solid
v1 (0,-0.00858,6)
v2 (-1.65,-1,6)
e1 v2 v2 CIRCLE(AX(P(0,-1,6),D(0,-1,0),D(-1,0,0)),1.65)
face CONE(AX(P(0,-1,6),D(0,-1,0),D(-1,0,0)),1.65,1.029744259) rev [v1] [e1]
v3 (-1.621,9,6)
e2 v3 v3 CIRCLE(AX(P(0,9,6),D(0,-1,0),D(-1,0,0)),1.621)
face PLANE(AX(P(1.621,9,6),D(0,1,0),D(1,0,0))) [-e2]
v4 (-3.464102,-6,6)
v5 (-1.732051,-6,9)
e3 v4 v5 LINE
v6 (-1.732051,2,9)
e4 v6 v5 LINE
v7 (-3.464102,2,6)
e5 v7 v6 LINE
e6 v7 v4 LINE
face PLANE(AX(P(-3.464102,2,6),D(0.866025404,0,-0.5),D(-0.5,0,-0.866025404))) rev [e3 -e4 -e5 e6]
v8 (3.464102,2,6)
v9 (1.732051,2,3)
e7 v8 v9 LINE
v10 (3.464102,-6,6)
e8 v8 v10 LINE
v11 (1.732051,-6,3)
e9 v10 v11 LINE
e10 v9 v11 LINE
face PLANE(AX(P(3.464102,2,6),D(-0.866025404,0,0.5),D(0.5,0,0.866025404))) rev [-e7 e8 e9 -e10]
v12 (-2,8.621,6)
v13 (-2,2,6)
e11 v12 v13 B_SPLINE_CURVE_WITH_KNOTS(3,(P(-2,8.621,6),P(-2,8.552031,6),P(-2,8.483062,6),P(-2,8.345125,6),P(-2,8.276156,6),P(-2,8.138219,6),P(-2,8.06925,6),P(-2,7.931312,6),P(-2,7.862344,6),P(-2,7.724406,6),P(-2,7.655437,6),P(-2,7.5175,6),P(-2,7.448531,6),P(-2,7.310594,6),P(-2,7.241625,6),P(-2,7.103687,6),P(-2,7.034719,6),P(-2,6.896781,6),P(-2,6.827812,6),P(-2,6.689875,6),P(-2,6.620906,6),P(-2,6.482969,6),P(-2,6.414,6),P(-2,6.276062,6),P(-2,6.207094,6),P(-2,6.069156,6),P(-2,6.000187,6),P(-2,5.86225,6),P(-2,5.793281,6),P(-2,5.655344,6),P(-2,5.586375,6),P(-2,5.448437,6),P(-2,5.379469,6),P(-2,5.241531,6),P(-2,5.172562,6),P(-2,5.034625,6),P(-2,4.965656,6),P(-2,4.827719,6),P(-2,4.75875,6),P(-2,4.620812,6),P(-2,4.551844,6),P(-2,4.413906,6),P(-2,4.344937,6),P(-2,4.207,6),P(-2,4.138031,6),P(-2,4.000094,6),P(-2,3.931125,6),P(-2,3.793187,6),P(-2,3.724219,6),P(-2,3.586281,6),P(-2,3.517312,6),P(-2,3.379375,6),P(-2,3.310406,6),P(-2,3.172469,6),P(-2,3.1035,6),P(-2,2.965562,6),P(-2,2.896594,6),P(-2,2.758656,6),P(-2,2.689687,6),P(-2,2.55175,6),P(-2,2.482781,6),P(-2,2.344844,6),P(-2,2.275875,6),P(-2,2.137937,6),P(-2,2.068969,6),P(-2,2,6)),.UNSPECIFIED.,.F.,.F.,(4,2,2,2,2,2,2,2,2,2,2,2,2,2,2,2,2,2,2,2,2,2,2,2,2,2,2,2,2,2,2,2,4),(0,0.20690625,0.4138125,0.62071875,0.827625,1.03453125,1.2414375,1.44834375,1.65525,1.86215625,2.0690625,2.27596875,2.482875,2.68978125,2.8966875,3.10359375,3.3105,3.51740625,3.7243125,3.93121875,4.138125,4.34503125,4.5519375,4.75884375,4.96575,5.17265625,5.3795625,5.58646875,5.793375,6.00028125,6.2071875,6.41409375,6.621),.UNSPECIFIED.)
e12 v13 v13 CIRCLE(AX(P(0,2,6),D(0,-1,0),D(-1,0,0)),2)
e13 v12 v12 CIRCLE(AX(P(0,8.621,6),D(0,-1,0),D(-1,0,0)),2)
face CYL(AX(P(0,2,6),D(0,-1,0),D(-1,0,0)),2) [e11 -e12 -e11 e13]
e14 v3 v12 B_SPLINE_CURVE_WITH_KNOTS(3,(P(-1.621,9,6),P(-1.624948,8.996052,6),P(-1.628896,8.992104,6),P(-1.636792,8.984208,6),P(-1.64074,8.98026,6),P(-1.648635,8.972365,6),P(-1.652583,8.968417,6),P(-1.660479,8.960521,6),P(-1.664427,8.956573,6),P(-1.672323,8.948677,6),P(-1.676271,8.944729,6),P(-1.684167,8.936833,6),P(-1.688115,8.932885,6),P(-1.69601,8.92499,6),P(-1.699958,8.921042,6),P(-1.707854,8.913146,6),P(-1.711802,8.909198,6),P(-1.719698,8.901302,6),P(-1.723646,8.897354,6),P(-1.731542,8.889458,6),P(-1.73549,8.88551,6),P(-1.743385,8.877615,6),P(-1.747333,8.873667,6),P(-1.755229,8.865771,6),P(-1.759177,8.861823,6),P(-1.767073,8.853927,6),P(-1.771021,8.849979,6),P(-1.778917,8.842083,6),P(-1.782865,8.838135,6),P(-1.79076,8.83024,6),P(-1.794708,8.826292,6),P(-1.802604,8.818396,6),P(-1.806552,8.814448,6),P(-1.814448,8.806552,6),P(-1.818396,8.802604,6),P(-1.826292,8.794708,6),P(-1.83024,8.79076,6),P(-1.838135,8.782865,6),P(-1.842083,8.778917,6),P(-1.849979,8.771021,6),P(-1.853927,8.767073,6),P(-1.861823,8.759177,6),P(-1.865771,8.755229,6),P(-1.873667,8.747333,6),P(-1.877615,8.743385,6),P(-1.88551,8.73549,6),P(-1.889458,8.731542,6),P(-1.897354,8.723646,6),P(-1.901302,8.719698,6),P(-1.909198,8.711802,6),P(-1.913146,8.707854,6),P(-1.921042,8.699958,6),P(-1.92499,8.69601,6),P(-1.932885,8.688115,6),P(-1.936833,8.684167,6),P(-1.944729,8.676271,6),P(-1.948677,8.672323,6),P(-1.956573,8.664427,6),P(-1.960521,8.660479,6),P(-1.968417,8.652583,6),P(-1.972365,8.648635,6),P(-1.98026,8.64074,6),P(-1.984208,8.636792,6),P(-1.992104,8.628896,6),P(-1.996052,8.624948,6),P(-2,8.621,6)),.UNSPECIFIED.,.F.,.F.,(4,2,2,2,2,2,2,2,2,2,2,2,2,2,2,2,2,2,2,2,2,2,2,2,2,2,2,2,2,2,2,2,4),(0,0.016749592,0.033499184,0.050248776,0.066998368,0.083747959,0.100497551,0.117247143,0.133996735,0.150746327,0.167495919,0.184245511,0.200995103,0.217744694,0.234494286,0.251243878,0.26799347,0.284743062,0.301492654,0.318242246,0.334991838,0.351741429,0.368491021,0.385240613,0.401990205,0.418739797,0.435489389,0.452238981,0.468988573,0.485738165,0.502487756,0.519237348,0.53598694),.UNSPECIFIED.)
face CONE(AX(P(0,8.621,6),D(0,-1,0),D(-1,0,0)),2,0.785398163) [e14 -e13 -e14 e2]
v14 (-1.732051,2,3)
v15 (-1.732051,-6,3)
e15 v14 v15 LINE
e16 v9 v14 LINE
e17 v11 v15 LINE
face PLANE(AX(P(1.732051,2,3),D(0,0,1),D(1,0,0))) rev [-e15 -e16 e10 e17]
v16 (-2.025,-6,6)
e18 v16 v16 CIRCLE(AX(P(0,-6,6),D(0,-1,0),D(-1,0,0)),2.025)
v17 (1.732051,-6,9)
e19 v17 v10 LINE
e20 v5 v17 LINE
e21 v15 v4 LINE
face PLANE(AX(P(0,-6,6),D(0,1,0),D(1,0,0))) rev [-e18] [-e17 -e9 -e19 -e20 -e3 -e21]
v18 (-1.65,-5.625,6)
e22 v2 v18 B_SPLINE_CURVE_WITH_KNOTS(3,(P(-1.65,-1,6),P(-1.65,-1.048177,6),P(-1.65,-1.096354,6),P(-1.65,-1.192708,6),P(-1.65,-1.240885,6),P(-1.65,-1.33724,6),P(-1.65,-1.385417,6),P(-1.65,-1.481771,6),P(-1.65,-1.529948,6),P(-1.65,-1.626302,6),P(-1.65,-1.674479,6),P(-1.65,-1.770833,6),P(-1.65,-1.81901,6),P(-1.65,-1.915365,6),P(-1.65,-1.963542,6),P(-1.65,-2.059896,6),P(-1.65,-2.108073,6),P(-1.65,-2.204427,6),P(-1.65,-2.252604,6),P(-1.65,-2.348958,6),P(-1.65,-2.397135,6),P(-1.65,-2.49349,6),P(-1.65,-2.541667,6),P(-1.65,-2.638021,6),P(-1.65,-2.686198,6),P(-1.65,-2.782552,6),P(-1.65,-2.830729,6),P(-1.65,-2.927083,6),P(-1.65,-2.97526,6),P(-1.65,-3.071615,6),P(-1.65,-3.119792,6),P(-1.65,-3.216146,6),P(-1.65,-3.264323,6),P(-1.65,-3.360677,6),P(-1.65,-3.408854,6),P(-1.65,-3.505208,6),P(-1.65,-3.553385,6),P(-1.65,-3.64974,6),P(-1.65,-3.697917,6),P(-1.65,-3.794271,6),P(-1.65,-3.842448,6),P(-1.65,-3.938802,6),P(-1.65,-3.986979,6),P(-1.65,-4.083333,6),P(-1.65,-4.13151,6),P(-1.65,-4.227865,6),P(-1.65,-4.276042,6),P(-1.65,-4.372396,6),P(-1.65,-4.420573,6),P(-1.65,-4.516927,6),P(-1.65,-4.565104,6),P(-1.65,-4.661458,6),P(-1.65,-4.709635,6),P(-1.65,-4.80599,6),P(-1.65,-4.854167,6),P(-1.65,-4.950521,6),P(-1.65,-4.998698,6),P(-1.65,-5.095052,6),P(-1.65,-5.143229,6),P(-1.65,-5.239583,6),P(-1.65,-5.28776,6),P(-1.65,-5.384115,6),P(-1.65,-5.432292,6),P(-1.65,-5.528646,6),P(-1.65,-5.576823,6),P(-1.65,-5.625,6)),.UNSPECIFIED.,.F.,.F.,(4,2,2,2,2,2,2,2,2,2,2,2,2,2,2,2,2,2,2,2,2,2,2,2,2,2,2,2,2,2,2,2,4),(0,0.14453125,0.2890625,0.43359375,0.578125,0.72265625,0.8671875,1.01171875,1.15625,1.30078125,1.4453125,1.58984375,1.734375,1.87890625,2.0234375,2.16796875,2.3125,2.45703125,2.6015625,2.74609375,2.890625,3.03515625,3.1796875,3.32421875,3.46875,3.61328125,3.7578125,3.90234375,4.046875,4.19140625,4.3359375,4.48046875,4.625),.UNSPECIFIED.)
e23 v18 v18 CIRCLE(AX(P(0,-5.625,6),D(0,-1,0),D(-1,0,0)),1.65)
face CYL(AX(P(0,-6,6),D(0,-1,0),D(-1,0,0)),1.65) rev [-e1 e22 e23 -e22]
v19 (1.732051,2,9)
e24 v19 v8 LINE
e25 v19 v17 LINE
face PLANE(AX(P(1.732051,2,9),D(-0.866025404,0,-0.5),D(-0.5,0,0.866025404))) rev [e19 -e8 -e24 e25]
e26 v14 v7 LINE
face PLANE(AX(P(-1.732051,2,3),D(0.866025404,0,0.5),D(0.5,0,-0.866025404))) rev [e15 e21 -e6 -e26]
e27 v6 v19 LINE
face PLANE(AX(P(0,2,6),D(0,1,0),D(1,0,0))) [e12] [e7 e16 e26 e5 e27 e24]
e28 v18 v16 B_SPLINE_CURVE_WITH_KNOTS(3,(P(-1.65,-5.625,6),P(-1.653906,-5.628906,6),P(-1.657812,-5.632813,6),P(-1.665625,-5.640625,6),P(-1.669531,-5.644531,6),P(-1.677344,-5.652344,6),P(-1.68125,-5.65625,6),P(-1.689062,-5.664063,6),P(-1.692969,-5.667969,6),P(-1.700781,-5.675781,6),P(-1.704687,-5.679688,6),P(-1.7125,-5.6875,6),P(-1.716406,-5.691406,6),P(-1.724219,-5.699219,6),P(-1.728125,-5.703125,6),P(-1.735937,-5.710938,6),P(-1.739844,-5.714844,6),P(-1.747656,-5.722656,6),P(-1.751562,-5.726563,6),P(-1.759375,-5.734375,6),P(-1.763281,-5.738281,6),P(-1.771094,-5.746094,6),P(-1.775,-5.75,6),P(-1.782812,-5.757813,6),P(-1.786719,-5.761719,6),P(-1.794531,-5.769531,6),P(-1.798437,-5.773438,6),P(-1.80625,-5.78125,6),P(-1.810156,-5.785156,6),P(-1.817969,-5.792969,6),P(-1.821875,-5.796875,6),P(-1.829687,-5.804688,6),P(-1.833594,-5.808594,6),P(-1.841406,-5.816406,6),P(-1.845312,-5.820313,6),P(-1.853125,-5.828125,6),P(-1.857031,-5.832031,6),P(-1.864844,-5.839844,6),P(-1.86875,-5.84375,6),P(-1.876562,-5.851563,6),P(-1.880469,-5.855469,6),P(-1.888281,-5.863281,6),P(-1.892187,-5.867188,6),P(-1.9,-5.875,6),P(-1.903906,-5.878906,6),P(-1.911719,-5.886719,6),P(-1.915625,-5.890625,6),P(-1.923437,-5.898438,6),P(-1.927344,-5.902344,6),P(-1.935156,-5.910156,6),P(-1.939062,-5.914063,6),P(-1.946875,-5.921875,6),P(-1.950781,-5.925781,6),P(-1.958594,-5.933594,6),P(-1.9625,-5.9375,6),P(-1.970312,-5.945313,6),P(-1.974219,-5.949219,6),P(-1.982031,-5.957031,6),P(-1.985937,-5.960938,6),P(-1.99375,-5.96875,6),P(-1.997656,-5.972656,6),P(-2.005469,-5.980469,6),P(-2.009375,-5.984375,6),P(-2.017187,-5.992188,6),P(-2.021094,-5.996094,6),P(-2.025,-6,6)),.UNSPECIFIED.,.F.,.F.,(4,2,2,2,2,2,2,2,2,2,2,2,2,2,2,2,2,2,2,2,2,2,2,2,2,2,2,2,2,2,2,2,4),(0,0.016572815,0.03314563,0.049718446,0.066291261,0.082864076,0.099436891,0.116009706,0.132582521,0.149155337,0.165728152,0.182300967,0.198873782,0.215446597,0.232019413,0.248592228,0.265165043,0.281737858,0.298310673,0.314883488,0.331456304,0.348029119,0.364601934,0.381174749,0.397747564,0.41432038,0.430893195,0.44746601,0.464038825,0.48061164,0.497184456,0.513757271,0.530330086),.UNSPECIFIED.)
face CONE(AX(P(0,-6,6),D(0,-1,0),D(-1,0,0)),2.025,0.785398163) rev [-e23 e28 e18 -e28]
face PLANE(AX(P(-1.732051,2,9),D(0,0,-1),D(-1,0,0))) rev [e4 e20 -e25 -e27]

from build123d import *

# Parameters (mm, degrees)
EXTRUDE_1_DEPTH              = 8
HOLE_WIZARD_M4_1_D           = 3.3
HOLE_WIZARD_M4_1_DEPTH       = 5
HOLE_WIZARD_M4_1_CSINK_D     = 4.05
HOLE_WIZARD_M4_1_CSINK_ANGLE = 90
HOLE_WIZARD_M4_1_TIP         = 0.991420021
MOVE_BODY_1_ANGLE            = 90


# Read off the part's stored shape, not the designer's step: M4 机械螺纹 螺柱1
with BuildPart() as part:
    # 草图1 → 凸台-拉伸1 (new body)
    with BuildSketch(Plane.XY):
        Polygon((3.464101615, 0), (1.732050808, 3), (-1.732050808, 3), (-3.464101615, 0), (-1.732050808, -3), (1.732050808, -3), align=None)
    extrude(amount=EXTRUDE_1_DEPTH)

    # M4 螺纹孔1
    with Locations(Plane(origin=(0, 0, 0), x_dir=(-1, 0, 0), z_dir=(0, 0, -1))):
        with Locations((0, 0)):
            CounterSinkHole(HOLE_WIZARD_M4_1_D / 2, HOLE_WIZARD_M4_1_CSINK_D / 2, depth=HOLE_WIZARD_M4_1_DEPTH, counter_sink_angle=HOLE_WIZARD_M4_1_CSINK_ANGLE)
            with Locations((0, 0, -(HOLE_WIZARD_M4_1_DEPTH + HOLE_WIZARD_M4_1_TIP / 2))):  # 118° drill point
                Cone(0, HOLE_WIZARD_M4_1_D / 2, HOLE_WIZARD_M4_1_TIP, mode=Mode.SUBTRACT)

    # M4 机械螺纹 螺柱1 outline → M4 机械螺纹 螺柱1 (revolve)
    with BuildSketch(Plane.XZ):
        Polygon((1.621, 15), (0, 15), (0, 8), (2, 8), (2, 14.621), align=None)
    revolve(axis=Axis((0, 0, 0), (0, 0, 1)))


with BuildPart() as part_1:
    # Move Body 1: moved
    add(part.part.rotate(Axis((0, 0, 6), (-1, 0, 0)), MOVE_BODY_1_ANGLE))


solid = part_1.part
